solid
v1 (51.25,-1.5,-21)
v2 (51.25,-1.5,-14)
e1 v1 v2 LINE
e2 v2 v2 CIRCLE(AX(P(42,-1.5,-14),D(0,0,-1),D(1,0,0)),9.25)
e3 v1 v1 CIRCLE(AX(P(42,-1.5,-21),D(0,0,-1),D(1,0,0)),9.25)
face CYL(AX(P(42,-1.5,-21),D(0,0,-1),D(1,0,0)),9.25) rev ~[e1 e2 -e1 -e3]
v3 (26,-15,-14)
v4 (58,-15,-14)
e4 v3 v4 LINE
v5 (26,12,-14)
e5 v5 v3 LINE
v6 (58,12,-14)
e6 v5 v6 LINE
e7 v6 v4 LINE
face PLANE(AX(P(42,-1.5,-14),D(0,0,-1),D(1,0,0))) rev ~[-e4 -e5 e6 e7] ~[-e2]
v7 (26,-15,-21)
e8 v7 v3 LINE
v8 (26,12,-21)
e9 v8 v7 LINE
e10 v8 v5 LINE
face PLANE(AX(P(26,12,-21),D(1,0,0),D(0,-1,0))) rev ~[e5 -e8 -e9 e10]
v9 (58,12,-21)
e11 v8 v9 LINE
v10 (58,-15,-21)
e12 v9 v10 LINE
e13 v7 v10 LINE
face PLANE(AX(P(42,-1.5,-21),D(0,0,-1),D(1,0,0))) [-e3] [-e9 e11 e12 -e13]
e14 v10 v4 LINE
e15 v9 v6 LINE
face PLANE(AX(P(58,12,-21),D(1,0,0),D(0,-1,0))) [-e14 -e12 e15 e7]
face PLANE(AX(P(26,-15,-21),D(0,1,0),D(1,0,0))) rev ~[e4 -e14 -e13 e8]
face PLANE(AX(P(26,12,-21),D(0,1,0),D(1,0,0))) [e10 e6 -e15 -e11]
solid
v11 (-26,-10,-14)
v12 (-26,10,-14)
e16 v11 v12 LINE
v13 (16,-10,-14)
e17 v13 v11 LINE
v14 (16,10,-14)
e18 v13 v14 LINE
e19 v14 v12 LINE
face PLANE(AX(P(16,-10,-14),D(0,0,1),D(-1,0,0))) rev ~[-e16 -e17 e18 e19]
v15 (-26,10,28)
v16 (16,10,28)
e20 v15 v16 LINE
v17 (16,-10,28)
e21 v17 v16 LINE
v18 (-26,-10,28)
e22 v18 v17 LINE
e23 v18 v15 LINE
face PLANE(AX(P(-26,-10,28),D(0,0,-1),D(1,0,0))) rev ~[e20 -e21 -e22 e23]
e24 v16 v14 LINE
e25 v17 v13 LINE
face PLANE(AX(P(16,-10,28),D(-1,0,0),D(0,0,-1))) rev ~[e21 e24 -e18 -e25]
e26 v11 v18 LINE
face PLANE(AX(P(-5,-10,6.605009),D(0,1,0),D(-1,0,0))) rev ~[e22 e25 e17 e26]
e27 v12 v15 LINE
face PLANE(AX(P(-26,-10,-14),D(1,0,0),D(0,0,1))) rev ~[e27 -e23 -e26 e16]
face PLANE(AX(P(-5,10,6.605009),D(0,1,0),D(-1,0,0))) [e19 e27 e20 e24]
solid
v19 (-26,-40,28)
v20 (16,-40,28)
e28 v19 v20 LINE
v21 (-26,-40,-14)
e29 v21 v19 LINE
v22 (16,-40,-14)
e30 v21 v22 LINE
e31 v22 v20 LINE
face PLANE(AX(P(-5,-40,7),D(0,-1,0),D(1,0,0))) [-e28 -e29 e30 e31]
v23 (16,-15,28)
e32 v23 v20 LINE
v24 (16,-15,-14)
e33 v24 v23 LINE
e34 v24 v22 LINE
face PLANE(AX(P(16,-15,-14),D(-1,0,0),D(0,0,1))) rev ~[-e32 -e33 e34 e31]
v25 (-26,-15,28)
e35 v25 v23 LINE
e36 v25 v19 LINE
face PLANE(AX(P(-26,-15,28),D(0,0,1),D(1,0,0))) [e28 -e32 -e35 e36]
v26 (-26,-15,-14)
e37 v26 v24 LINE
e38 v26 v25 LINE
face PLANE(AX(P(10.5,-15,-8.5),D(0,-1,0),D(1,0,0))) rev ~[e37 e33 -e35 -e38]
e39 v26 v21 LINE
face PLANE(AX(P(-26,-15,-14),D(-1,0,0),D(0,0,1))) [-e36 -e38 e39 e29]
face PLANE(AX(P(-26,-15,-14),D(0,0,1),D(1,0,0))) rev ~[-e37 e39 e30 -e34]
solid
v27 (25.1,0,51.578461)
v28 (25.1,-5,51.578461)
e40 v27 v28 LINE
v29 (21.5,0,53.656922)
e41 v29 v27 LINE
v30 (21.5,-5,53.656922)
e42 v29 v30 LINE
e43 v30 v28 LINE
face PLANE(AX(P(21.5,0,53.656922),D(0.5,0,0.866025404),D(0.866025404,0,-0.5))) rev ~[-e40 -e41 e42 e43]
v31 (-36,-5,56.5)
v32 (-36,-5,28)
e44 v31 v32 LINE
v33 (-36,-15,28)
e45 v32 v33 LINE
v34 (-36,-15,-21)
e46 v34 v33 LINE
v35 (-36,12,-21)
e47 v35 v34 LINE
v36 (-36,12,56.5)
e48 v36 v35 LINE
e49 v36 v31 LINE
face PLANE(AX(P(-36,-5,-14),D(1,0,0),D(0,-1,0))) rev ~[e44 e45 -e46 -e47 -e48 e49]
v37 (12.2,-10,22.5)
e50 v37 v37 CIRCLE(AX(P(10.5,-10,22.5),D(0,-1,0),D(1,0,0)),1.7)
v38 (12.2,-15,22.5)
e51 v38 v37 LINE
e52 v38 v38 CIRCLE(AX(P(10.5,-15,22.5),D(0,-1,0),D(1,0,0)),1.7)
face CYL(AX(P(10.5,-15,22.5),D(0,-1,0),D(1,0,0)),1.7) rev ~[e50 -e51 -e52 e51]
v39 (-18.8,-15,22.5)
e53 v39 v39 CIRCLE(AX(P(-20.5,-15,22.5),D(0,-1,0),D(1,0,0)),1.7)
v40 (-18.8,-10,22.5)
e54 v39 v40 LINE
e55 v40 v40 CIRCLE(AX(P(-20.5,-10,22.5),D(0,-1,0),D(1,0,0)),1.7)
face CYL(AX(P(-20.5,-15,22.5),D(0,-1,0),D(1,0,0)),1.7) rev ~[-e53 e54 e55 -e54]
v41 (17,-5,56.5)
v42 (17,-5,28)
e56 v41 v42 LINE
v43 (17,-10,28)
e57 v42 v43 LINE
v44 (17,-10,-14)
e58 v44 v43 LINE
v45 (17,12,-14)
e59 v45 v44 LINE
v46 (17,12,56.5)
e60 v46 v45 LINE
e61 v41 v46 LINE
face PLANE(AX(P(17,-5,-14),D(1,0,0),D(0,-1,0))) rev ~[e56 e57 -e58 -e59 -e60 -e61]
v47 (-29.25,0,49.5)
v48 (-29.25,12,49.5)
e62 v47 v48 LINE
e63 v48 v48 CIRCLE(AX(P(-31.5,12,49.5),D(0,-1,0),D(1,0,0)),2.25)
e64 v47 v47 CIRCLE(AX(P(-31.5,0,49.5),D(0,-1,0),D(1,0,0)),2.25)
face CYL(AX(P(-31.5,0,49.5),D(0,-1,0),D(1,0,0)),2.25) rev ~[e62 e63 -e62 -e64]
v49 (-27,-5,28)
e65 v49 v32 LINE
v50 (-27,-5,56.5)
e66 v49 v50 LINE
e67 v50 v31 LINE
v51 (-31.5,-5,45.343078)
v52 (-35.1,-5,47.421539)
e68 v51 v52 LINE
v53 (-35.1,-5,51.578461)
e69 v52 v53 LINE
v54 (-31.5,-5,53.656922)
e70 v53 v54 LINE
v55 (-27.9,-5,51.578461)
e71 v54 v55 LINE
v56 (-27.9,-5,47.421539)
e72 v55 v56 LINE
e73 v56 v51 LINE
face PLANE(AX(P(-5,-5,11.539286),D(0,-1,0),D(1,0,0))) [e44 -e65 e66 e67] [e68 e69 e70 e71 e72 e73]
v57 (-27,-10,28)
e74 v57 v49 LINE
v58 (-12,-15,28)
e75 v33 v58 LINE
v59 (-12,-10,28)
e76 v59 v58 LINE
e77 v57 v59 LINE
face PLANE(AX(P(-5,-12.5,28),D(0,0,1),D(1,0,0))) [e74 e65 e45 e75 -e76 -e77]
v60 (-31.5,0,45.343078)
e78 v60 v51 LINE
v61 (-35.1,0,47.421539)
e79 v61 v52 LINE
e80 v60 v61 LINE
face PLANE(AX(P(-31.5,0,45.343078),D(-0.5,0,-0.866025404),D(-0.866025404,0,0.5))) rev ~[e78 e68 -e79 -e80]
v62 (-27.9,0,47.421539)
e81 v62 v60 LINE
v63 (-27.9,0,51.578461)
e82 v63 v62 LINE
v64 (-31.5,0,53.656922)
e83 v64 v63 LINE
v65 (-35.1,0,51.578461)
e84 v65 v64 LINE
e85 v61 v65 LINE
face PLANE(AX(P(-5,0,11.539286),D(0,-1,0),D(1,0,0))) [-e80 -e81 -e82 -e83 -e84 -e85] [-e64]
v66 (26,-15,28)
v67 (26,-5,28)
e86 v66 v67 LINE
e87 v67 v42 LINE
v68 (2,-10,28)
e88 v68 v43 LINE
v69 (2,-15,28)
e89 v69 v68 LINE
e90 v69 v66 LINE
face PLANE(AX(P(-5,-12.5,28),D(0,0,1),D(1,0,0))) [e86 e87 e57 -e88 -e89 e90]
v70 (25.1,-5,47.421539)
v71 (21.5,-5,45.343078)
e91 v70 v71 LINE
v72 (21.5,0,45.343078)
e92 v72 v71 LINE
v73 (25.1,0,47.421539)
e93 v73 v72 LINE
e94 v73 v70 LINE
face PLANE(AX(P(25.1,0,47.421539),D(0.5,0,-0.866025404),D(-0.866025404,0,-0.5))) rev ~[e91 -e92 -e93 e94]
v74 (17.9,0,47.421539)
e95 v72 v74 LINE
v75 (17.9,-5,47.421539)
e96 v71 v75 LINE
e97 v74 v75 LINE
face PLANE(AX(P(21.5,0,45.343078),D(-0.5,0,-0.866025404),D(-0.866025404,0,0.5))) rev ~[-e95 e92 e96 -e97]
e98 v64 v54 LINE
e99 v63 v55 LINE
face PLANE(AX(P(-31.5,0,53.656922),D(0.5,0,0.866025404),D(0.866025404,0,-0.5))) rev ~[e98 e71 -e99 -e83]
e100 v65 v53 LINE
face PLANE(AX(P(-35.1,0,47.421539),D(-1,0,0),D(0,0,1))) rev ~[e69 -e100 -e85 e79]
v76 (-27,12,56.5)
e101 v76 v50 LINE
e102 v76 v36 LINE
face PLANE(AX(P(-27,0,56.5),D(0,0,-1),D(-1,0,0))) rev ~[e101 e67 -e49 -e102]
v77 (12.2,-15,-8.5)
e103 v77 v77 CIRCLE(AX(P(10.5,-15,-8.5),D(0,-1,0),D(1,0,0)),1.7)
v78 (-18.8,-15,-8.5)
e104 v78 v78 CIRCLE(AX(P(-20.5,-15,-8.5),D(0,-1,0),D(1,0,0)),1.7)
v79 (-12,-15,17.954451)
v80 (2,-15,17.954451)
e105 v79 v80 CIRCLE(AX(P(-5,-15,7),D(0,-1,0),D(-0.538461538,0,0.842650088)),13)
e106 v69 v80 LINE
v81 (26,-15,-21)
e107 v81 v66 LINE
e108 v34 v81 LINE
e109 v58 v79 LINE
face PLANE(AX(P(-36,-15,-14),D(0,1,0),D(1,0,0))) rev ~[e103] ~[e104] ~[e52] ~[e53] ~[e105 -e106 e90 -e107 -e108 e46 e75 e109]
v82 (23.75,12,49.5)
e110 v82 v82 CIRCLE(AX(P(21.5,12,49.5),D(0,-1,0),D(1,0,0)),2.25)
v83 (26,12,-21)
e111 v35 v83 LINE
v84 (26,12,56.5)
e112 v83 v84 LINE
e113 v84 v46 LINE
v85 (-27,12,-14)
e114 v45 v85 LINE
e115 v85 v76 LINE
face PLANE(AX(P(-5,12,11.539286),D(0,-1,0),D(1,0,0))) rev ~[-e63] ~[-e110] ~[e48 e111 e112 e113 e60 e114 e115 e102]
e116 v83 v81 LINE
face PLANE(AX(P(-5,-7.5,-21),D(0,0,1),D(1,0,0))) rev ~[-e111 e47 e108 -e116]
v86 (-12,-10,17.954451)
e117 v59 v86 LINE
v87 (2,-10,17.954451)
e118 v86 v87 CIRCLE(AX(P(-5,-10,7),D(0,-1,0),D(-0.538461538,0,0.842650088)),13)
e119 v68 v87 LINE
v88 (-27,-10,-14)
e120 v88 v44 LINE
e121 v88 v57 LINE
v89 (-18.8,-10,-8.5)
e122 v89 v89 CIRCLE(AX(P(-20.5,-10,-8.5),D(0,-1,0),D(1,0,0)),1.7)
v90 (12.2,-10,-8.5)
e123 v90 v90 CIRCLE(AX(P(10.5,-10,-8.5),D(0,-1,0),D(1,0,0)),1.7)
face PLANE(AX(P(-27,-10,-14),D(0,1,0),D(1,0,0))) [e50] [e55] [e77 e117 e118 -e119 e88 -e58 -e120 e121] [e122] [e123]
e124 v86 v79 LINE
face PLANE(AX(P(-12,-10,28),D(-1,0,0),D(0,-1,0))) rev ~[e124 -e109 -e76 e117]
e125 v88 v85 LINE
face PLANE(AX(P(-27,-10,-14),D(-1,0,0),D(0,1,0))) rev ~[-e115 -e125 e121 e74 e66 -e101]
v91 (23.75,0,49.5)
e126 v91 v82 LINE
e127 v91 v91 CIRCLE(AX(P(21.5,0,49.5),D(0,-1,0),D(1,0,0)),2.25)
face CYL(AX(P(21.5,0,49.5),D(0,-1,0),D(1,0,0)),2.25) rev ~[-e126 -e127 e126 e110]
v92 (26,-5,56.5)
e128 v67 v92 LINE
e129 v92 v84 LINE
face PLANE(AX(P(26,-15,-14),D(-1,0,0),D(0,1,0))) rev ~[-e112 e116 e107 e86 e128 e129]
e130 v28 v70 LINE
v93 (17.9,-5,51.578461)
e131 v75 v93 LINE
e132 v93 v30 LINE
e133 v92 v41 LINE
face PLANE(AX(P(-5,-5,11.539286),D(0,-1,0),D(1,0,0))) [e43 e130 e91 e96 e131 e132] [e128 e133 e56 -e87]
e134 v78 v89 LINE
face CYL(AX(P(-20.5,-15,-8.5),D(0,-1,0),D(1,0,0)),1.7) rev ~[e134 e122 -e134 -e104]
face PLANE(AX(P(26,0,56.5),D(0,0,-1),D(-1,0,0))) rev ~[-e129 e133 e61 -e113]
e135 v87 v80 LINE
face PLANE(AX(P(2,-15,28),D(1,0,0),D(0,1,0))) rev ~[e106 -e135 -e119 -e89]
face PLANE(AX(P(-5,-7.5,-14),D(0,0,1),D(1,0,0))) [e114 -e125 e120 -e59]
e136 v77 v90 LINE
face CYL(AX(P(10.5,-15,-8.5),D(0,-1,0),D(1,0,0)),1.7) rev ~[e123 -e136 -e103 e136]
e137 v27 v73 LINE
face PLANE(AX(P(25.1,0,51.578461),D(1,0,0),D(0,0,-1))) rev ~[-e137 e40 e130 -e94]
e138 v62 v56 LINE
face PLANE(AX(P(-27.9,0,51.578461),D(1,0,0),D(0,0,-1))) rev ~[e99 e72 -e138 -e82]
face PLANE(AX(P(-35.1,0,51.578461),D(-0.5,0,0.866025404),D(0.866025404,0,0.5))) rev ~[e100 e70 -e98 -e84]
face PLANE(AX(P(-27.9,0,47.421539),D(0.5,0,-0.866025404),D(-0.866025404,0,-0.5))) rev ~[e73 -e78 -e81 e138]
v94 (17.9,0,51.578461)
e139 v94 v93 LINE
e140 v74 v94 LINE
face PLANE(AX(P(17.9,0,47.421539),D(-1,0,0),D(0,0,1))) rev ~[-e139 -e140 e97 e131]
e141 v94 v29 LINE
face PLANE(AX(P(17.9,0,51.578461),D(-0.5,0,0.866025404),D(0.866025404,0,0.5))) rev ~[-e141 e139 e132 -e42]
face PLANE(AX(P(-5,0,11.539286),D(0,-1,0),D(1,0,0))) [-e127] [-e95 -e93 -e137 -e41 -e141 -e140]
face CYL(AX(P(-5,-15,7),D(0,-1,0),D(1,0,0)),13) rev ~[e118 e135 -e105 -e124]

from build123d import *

# Parameters (mm, degrees)
F1_R      = 2.25
F2_DEPTH  = 12
F4_DEPTH  = 5
F5_W      = 44
F5_H      = 5
F6_DEPTH  = 7
F7_DEPTH  = 42
F8_R      = 1.7
F8_R_2    = 13
F9_DEPTH  = 5
F11_REACH = 63.8670687473
F12_R     = 1.7
F13_DEPTH = 20
F14_W     = 42
F14_H     = 42
F14_R     = 1.7
F14_R_2   = 13
F15_DEPTH = 25
F16_W     = 32
F16_H     = 27
F16_R     = 9.25
F17_DEPTH = 7


with BuildPart() as f2:
    # F1 (on Front) → F2 (new body)
    with BuildSketch(Plane.XZ):
        Polygon((-27, 56.5), (-36, 56.5), (-36, -21), (26, -21), (26, 56.5), (17, 56.5), (17, -14), (-27, -14), align=None)
        with Locations((-31.5, 49.5)):
            Circle(F1_R, mode=Mode.SUBTRACT)
        with Locations((21.5, 49.5)):
            Circle(F1_R, mode=Mode.SUBTRACT)
    extrude(amount=-F2_DEPTH)

    # F3 (on face) → F4 (join)
    with BuildSketch(Plane.XZ):
        Polygon((-27, -14), (-27, 56.5), (-36, 56.5), (-36, -21), (26, -21), (26, 56.5), (17, 56.5), (17, -14), align=None)
        Polygon((-31.5, 53.6569219382), (-27.9, 51.5784609691), (-27.9, 47.4215390309), (-31.5, 45.3430780618), (-35.1, 47.4215390309), (-35.1, 51.5784609691), align=None, mode=Mode.SUBTRACT)
        Polygon((21.5, 53.6569219382), (25.1, 51.5784609691), (25.1, 47.4215390309), (21.5, 45.3430780618), (17.9, 47.4215390309), (17.9, 51.5784609691), align=None, mode=Mode.SUBTRACT)
    extrude(amount=F4_DEPTH)

    # F5 (on face) → F6 (join, through all)
    with BuildSketch(Plane.XY.offset(-14)):
        with Locations((-5, -7.5)):
            Rectangle(F5_W, F5_H)
        with Locations((-5, -12.5)):
            Rectangle(F5_W, F5_H)
        Polygon((-27, -10), (-27, -5), (-36, -5), (-36, -15), (-27, -15), align=None)
        Polygon((26, -5), (17, -5), (17, -10), (17, -15), (26, -15), align=None)
    extrude(amount=-F6_DEPTH)

    # F5 (on face) → F7 (join)
    with BuildSketch(Plane.XY.offset(-14)):
        with Locations((-5, -12.5)):
            Rectangle(F5_W, F5_H)
        Polygon((-27, -10), (-27, -5), (-36, -5), (-36, -15), (-27, -15), align=None)
        Polygon((26, -5), (17, -5), (17, -10), (17, -15), (26, -15), align=None)
    extrude(amount=F7_DEPTH)

    # F8 (on face) → F9 (cut, through all)
    with BuildSketch(Plane.XZ.offset(15)):
        with Locations((-20.5, 22.5)):
            Circle(F8_R)
        with Locations((-5, 7)):
            Circle(F8_R_2)
        with Locations((-20.5, -8.5)):
            Circle(F8_R)
        with Locations((10.5, -8.5)):
            Circle(F8_R)
        with Locations((10.5, 22.5)):
            Circle(F8_R)
    extrude(amount=-F9_DEPTH, mode=Mode.SUBTRACT)

    f11_end = f2.faces().sort_by_distance((-18, -12.5, 7))[0]
    # F10 (on face) → F11 (cut, up to a face of the model that its end follows)
    with BuildSketch(Plane.XY.offset(28)):
        Polygon((2, -10), (-5, -10), (-12, -10), (-12, -15), (2, -15), align=None)
    f11_long = extrude(amount=-F11_REACH, mode=Mode.PRIVATE)
    add(split(f11_long, bisect_by=f11_end, keep=Keep.ALL, mode=Mode.PRIVATE).solids().sort_by_distance((-5, -12.5, 28))[0], mode=Mode.SUBTRACT)


with BuildPart() as f13:
    # F12 (on face) → F13 (new body)
    with BuildSketch(Plane(origin=(0, -10, 0), x_dir=(-1, 0, 0), z_dir=(0, 1, 0))):
        with BuildLine():
            Line((-16, -14), (26, -14))
            Line((26, -14), (26, 28))
            Line((26, 28), (12, 28))
            Line((12, 28), (12, 17.9544511501))
            ThreePointArc((12, 17.9544511501), (5, -6), (-2, 17.9544511501))
            Line((-2, 17.9544511501), (-2, 28))
            Line((-2, 28), (-16, 28))
            Line((-16, 28), (-16, -14))
        make_face()
        with Locations((-10.5, -8.5)):
            Circle(F12_R, mode=Mode.SUBTRACT)
        with Locations((20.5, -8.5)):
            Circle(F12_R, mode=Mode.SUBTRACT)
        with Locations((-10.5, 22.5)):
            Circle(F12_R, mode=Mode.SUBTRACT)
        with Locations((20.5, 22.5)):
            Circle(F12_R, mode=Mode.SUBTRACT)
        with BuildLine():
            Line((12, 17.9544511501), (12, 28))
            Line((12, 28), (-2, 28))
            Line((-2, 28), (-2, 17.9544511501))
            ThreePointArc((-2, 17.9544511501), (5, -6), (12, 17.9544511501))
        make_face()
        with Locations((-10.5, 22.5)):
            Circle(F12_R)
        with Locations((20.5, 22.5)):
            Circle(F12_R)
        with Locations((-10.5, -8.5)):
            Circle(F12_R)
        with Locations((20.5, -8.5)):
            Circle(F12_R)
    extrude(amount=F13_DEPTH)


with BuildPart() as f15:
    # F14 (on face) → F15 (new body)
    with BuildSketch(Plane.XZ.offset(15)):
        with Locations((-5, 7)):
            Rectangle(F14_W, F14_H)
        with Locations((-20.5, -8.5)):
            Circle(F14_R, mode=Mode.SUBTRACT)
        with Locations((10.5, -8.5)):
            Circle(F14_R, mode=Mode.SUBTRACT)
        with Locations((-20.5, 22.5)):
            Circle(F14_R, mode=Mode.SUBTRACT)
        with Locations((-5, 7)):
            Circle(F14_R_2, mode=Mode.SUBTRACT)
        with Locations((10.5, 22.5)):
            Circle(F14_R, mode=Mode.SUBTRACT)
    extrude(amount=F15_DEPTH)

    # F8 (on face) → F15, piece 2 (join)
    with BuildSketch(Plane.XZ.offset(15)):
        with Locations((-20.5, 22.5)):
            Circle(F8_R)
    extrude(amount=F15_DEPTH)

    # F8 (on face) → F15, piece 3 (join)
    with BuildSketch(Plane.XZ.offset(15)):
        with Locations((-5, 7)):
            Circle(F8_R_2)
    extrude(amount=F15_DEPTH)

    # F8 (on face) → F15, piece 4 (join)
    with BuildSketch(Plane.XZ.offset(15)):
        with Locations((-20.5, -8.5)):
            Circle(F8_R)
    extrude(amount=F15_DEPTH)

    # F8 (on face) → F15, piece 5 (join)
    with BuildSketch(Plane.XZ.offset(15)):
        with Locations((10.5, 22.5)):
            Circle(F8_R)
    extrude(amount=F15_DEPTH)

    # F8 (on face) → F15, piece 6 (join)
    with BuildSketch(Plane.XZ.offset(15)):
        with Locations((10.5, -8.5)):
            Circle(F8_R)
    extrude(amount=F15_DEPTH)


with BuildPart() as f17:
    # F16 (on face) → F17 (new body, through all)
    with BuildSketch(Plane(origin=(0, 0, -21), x_dir=(1, 0, 0), z_dir=(0, 0, -1))):
        with Locations((42, 1.5)):
            Rectangle(F16_W, F16_H)
        with Locations((42, 1.5)):
            Circle(F16_R, mode=Mode.SUBTRACT)
    extrude(amount=-F17_DEPTH)


solid = Compound([f2.part, f13.part, f15.part, f17.part])
